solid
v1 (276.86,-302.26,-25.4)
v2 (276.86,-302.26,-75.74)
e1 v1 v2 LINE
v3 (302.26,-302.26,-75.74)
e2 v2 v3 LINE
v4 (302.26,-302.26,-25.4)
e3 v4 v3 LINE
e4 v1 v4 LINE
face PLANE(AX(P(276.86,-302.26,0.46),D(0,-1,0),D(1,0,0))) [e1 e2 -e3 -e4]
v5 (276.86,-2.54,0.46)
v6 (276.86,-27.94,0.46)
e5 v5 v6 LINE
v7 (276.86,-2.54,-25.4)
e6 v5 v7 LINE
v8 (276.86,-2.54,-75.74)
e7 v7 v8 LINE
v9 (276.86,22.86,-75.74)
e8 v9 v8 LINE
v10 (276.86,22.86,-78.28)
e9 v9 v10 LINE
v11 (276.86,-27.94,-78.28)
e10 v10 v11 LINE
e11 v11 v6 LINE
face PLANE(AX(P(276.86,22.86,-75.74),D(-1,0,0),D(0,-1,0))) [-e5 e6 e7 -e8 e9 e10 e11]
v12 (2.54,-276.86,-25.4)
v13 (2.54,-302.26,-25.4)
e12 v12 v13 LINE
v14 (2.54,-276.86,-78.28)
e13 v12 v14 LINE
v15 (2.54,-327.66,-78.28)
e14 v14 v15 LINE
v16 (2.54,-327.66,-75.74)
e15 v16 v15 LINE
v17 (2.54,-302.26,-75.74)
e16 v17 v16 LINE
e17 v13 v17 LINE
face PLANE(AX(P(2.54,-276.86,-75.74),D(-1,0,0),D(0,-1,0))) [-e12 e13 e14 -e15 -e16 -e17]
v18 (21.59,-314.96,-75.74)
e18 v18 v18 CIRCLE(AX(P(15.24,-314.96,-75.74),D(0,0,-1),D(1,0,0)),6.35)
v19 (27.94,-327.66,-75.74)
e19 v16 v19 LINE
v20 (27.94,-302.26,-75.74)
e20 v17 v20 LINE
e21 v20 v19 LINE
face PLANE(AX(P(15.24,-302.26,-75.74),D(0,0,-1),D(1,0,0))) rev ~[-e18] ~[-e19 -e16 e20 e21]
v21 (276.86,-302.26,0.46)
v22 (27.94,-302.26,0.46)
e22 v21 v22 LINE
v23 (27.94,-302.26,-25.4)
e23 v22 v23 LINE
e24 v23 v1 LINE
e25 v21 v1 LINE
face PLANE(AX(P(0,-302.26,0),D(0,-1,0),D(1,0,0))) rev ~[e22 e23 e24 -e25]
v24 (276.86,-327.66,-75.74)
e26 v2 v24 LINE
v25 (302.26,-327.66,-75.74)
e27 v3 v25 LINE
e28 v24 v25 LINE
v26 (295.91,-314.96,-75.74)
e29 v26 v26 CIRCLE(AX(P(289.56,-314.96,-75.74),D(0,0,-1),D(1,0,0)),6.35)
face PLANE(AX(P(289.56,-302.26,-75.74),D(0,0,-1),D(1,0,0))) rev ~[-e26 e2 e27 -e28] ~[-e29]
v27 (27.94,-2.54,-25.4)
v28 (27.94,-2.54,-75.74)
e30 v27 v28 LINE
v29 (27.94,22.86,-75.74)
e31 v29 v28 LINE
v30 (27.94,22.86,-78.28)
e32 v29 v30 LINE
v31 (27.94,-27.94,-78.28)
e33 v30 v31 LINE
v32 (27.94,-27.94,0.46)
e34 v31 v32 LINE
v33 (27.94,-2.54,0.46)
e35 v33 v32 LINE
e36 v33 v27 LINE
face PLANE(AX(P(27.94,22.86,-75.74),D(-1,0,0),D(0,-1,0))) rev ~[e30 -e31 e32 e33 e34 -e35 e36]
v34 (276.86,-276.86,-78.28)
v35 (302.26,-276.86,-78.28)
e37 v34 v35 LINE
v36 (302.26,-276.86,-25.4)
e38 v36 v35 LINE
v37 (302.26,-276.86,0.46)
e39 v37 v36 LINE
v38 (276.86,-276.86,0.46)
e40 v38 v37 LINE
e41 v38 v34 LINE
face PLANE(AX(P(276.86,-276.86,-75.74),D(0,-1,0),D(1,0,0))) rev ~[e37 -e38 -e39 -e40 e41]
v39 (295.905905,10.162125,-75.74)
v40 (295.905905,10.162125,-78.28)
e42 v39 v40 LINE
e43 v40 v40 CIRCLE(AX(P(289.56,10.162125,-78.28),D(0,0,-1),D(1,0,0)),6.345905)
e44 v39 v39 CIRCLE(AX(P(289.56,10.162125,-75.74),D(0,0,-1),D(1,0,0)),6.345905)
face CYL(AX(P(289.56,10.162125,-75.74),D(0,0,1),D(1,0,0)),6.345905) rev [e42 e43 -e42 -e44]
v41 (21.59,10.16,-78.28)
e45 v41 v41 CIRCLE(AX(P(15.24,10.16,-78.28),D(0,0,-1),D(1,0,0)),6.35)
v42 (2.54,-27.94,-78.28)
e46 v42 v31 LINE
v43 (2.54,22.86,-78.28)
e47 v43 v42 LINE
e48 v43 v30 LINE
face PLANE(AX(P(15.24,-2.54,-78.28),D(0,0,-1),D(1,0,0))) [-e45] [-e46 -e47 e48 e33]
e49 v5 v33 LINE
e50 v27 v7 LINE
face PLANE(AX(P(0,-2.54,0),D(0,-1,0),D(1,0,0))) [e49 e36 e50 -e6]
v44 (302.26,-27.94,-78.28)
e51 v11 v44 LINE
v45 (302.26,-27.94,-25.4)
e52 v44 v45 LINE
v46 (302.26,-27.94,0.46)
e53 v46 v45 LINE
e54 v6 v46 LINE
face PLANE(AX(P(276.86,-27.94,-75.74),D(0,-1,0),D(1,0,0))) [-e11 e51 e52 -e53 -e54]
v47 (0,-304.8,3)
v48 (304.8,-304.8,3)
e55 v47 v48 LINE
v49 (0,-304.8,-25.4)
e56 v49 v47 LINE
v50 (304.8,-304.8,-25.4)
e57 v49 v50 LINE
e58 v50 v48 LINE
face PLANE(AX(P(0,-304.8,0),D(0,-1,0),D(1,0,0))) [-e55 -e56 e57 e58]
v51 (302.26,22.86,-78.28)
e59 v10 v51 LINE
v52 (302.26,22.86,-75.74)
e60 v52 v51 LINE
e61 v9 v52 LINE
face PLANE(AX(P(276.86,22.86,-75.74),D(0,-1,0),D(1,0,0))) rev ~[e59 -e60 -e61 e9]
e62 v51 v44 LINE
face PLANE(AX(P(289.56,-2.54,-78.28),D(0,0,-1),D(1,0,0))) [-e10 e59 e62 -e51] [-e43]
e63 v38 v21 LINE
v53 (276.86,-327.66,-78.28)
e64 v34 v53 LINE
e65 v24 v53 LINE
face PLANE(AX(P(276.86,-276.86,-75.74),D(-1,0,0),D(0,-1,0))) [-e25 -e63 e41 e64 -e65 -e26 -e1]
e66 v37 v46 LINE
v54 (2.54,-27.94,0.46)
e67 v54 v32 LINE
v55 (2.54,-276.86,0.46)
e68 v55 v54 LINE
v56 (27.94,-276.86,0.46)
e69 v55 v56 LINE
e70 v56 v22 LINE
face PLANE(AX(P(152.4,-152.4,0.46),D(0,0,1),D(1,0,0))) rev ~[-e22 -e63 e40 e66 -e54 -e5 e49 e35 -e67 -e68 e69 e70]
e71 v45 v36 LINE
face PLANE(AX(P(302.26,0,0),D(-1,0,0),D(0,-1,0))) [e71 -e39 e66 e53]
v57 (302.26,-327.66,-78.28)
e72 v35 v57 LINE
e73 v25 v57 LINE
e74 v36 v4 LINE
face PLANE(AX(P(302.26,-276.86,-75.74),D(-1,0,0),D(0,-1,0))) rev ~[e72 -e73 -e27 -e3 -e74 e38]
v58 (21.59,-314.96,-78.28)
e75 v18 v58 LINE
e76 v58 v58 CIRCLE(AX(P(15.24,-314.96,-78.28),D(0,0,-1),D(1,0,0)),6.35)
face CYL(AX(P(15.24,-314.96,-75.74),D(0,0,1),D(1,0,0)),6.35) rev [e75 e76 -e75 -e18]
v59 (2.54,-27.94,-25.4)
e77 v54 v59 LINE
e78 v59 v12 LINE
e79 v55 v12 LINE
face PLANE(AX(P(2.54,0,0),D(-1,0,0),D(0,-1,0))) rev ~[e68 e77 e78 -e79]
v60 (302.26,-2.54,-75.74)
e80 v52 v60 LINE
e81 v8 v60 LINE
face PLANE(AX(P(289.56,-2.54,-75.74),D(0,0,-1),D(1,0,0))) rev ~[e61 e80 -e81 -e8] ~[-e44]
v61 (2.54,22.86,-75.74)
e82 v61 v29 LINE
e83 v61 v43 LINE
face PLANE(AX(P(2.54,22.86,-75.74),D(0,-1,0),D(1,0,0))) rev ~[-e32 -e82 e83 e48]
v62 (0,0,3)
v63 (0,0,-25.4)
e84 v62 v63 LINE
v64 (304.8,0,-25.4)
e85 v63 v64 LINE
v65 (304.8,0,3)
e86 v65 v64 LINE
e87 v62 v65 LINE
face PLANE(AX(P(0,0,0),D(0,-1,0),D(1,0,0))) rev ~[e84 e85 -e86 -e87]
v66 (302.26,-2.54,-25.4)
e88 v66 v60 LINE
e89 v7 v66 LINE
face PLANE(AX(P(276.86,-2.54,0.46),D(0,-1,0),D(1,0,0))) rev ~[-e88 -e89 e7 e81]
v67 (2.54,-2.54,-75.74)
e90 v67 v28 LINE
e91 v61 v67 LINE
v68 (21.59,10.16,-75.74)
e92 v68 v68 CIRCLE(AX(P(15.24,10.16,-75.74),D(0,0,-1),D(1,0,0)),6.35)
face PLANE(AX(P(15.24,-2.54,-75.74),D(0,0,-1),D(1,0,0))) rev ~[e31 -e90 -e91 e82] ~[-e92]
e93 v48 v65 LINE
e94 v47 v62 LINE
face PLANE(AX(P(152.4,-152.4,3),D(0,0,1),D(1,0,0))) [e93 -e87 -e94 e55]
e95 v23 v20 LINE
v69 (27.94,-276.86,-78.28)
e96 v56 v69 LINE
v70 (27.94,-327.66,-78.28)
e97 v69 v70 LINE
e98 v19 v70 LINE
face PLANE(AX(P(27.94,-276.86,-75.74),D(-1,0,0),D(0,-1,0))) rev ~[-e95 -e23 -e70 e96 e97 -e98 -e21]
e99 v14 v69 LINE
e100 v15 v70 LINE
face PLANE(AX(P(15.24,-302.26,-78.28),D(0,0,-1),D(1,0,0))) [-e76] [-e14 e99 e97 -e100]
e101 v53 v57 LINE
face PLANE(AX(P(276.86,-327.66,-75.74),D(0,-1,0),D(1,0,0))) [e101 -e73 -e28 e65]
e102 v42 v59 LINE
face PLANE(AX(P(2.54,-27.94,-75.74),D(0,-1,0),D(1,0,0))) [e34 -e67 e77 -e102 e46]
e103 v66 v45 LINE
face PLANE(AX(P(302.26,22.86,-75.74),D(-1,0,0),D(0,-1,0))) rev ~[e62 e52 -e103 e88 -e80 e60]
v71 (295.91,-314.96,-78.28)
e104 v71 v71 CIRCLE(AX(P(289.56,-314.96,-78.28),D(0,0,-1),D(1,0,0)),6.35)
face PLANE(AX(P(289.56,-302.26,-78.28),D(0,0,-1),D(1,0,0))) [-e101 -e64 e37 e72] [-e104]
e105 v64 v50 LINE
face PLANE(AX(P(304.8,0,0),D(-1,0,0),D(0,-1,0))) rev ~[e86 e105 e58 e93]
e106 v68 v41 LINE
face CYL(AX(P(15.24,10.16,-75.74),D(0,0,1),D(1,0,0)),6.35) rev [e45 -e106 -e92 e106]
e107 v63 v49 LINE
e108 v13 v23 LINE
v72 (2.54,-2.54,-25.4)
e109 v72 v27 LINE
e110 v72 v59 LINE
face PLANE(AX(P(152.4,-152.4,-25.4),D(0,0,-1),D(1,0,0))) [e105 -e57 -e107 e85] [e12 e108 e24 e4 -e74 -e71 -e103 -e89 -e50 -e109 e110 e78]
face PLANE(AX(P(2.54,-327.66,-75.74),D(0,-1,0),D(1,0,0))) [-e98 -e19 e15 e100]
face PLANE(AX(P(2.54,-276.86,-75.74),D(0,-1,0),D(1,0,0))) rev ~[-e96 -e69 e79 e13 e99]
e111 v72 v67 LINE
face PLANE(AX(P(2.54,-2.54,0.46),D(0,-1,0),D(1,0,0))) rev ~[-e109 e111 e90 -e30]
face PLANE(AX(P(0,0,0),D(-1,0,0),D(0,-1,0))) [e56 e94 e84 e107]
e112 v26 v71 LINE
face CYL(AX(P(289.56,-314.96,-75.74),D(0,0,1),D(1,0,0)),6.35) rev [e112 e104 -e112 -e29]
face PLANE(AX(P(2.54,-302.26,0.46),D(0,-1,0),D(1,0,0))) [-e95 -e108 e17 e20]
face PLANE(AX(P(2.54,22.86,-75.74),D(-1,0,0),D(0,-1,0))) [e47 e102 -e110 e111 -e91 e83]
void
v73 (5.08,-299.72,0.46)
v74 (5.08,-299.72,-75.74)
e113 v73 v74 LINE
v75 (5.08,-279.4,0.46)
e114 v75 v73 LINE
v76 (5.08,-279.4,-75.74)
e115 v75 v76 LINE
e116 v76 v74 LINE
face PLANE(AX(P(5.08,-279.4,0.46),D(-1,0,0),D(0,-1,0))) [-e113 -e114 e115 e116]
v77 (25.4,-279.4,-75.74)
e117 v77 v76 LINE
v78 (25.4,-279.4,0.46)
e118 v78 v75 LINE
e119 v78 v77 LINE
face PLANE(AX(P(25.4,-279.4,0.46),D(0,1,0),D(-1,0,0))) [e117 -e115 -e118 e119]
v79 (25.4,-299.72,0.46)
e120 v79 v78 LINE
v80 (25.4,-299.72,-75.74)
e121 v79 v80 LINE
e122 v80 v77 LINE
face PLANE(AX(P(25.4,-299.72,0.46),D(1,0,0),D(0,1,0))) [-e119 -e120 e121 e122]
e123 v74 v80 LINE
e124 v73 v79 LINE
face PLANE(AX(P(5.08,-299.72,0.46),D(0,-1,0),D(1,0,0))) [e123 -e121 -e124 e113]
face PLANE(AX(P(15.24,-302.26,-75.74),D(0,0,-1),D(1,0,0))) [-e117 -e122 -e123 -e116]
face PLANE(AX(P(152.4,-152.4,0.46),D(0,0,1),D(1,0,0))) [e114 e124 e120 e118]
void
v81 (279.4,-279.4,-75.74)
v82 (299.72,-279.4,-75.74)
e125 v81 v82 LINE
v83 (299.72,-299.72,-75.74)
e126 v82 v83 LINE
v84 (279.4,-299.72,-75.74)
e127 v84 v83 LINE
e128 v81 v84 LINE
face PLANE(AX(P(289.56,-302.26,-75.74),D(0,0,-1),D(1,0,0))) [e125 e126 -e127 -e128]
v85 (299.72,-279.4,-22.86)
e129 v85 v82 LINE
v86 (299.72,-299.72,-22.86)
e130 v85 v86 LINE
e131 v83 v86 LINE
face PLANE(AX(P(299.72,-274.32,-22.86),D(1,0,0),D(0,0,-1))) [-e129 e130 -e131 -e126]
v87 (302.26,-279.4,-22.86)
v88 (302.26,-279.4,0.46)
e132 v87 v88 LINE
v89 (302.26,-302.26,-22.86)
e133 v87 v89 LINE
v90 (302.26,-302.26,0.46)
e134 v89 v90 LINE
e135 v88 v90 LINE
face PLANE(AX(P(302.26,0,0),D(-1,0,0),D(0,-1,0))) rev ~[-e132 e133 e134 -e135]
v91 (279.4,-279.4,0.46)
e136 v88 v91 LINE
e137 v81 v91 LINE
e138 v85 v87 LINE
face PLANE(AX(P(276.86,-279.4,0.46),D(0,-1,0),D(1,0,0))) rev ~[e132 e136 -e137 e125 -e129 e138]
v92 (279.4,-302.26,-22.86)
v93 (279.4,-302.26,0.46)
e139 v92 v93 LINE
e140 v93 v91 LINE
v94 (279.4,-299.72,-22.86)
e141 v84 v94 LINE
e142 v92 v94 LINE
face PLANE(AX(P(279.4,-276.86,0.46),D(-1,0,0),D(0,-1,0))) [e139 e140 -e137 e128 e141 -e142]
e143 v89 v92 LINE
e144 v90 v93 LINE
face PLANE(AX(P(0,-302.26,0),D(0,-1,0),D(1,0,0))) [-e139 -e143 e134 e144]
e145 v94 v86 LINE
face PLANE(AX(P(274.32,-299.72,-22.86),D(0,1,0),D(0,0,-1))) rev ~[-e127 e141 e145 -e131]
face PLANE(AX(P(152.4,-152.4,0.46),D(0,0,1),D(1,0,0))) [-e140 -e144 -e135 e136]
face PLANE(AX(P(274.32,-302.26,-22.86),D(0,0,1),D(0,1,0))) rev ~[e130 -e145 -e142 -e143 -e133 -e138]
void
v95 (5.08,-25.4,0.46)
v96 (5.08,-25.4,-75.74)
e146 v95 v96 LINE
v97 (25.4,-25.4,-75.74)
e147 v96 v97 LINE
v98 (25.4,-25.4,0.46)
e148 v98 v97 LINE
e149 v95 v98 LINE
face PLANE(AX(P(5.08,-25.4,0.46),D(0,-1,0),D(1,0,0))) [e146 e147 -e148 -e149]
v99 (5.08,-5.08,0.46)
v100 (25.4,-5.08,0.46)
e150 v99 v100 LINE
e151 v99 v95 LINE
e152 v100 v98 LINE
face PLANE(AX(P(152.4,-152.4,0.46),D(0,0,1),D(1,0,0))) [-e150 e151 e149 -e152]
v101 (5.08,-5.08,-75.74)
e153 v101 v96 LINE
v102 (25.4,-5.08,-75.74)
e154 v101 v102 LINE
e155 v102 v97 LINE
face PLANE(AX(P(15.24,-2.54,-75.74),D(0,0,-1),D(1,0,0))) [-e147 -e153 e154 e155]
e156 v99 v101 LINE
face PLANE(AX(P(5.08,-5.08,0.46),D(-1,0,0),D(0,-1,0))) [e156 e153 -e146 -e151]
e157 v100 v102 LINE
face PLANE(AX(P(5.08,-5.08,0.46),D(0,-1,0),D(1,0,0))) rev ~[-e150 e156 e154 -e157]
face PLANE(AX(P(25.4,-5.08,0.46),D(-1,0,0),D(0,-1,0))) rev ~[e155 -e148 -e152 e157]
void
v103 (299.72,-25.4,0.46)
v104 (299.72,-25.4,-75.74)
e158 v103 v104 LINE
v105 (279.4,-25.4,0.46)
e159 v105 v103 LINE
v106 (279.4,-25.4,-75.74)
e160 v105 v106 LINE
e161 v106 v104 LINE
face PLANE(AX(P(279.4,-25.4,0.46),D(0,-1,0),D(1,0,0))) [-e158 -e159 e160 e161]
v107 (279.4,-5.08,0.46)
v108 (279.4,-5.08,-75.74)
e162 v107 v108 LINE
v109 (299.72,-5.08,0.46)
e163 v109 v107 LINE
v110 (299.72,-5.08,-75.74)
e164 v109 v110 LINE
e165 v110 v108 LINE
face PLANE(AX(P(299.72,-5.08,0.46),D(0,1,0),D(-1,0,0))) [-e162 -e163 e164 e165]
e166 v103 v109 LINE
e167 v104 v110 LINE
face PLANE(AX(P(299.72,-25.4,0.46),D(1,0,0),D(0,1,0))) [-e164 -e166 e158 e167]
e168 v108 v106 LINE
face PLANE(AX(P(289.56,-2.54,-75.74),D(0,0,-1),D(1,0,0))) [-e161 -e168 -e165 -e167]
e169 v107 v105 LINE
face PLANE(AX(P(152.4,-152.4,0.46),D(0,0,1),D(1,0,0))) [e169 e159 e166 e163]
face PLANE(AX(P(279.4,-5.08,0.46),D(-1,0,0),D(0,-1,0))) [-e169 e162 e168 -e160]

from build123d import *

# Parameters (mm, degrees)
F0_W         = 304.8
F0_H         = 304.8
F1_DEPTH     = 3
F2_W         = 304.8
F2_H         = 304.8
F3_DEPTH     = 25.4
F4_T         = -2.54
F5_W         = 25.4
F5_H         = 25.4
F6_DEPTH     = 76.2
F7_T         = 2.54
F7_T3_DEPTH  = 30.48
F7_T5_DEPTH  = 30.48
F7_T7_DEPTH  = 30.94
F7_T9_DEPTH  = 304.8
F7_T11_DEPTH = 279.4
F7_T13_DEPTH = 279.4
F7_T15_DEPTH = 304.8
F8_W         = 25.4
F8_H         = 25.4
F8_W_2       = 20.32
F8_H_2       = 20.32
F9_DEPTH     = 76.2
F10_W        = 25.4
F10_H        = 50.8
F10_R        = 6.3459053742
F11_DEPTH    = 2.54
F12_W        = 25.4
F12_H        = 50.8
F12_R        = 6.35
F13_DEPTH    = 2.54
F14_W        = 25.4
F14_H        = 50.8
F14_R        = 6.35
F15_DEPTH    = 2.54
F16_W        = 25.4
F16_H        = 50.8
F16_R        = 6.35
F17_DEPTH    = 2.54


# Not quite as in the source:
# - a shell that OpenCascade refuses in one call is made with other operations: the cavity is built on its own and cut out


with BuildPart() as f1:
    # F0 (on Top) → F1 (new body)
    with BuildSketch(Plane.XY):
        with Locations((152.4, -152.4)):
            Rectangle(F0_W, F0_H)
    extrude(amount=F1_DEPTH)

    # F2 (on face) → F3 (join)
    with BuildSketch(Plane(origin=(0, 0, 0), x_dir=(1, 0, 0), z_dir=(0, 0, -1))):
        with Locations((152.4, 152.4)):
            Rectangle(F2_W, F2_H)
    extrude(amount=F3_DEPTH)

    # F4
    f4_openings = [f1.faces().sort_by_distance(p)[0] for p in [
        (152.4, -152.4, -25.4),
    ]]
    offset(amount=F4_T, openings=f4_openings)

    # F5 (on face) → F6 (join)
    with BuildSketch(Plane(origin=(0, 0, 0.46), x_dir=(1, 0, 0), z_dir=(0, 0, -1))):
        with Locations((289.56, 289.56)):
            Rectangle(F5_W, F5_H)
    extrude(amount=F6_DEPTH)

    # F7: shell of thickness 2.54, made by hand


with BuildPart() as f7_core1:
    # F7_t2: copy of F1
    add(f1.part)

    # the walls: a layer under each face that stays
    f7_faces = [f7_core1.faces().sort_by_distance(p)[0] for p in [
        (152.4, -304.8, -11.2),
        (152.4, -152.4, 3),
        (304.8, -152.4, -11.2),
        (2.38125, -120.4148148148, -25.4),
        (0, -152.4, -11.2),
        (152.4, 0, -11.2),
        (2.54, -152.4, -12.47),
        (289.56, -302.26, -50.57),
        (139.7, -302.26, -12.47),
        (302.26, -139.7, -12.47),
        (302.26, -289.56, -50.57),
        (152.4, -2.54, -12.47),
        (152.4, -152.4, 0.46),
        (276.86, -289.56, -37.64),
        (289.56, -276.86, -37.64),
    ]]
    thicken(f7_faces, amount=-F7_T, mode=Mode.SUBTRACT)

    # F7_s4 → F7_t3 (cut)
    with BuildSketch(Plane.YZ.offset(274.32)):
        Polygon((-302.2854, -25.4254), (-302.26, -22.86), (-299.72, -22.86), (-299.72, -25.4), align=None)
        Polygon((-276.8346, 0.4346), (-276.86, 3), (-279.4, 3), (-279.4, 0.46), align=None)
    extrude(amount=F7_T3_DEPTH, mode=Mode.SUBTRACT)

    # F7_s6 → F7_t5 (cut)
    with BuildSketch(Plane.XZ.offset(274.32)):
        Polygon((302.2854, -25.4254), (302.26, -22.86), (299.72, -22.86), (299.72, -25.4), align=None)
        Polygon((276.8346, 0.4346), (276.86, 3), (279.4, 3), (279.4, 0.46), align=None)
    extrude(amount=F7_T5_DEPTH, mode=Mode.SUBTRACT)

    # F7_s8 → F7_t7 (cut)
    with BuildSketch(Plane.XY.offset(-27.94)):
        Polygon((2.5654, -2.5654), (0, -2.54), (0, 0), (2.54, 0), align=None)
        Polygon((2.5654, -302.2346), (0, -302.26), (0, -304.8), (2.54, -304.8), align=None)
        Polygon((276.8346, -302.2346), (276.86, -304.8), (279.4, -304.8), (279.4, -302.26), align=None)
        Polygon((302.2346, -2.5654), (304.8, -2.54), (304.8, 0), (302.26, 0), align=None)
        Polygon((302.2346, -276.8346), (304.8, -276.86), (304.8, -279.4), (302.26, -279.4), align=None)
    extrude(amount=F7_T7_DEPTH, mode=Mode.SUBTRACT)

    # F7_s10 → F7_t9 (cut)
    with BuildSketch(Plane.XZ):
        Polygon((2.5654, 0.4346), (0, 0.46), (0, 3), (2.54, 3), align=None)
    extrude(amount=F7_T9_DEPTH, mode=Mode.SUBTRACT)

    # F7_s12 → F7_t11 (cut)
    with BuildSketch(Plane.YZ):
        Polygon((-302.2346, 0.4346), (-304.8, 0.46), (-304.8, 3), (-302.26, 3), align=None)
    extrude(amount=F7_T11_DEPTH, mode=Mode.SUBTRACT)

    # F7_s14 → F7_t13 (cut)
    with BuildSketch(Plane.XZ):
        Polygon((302.2346, 0.4346), (304.8, 0.46), (304.8, 3), (302.26, 3), align=None)
    extrude(amount=F7_T13_DEPTH, mode=Mode.SUBTRACT)

    # F7_s16 → F7_t15 (cut)
    with BuildSketch(Plane.YZ):
        Polygon((-2.5654, 0.4346), (0, 0.46), (0, 3), (-2.54, 3), align=None)
    extrude(amount=F7_T15_DEPTH, mode=Mode.SUBTRACT)


with BuildPart() as f1_1:
    add(f1.part)

    # what is left inside the walls is the cavity
    f7_cavity = [f7_core1.part.solids().sort_by_distance(p)[0] for p in [
        (290.83, -279.4254, -50.34),
    ]]
    add(f7_cavity, mode=Mode.SUBTRACT)

    # F8 (on face) → F9 (join)
    with BuildSketch(Plane(origin=(0, 0, 0.46), x_dir=(1, 0, 0), z_dir=(0, 0, -1))):
        with Locations((15.24, 15.24)):
            Rectangle(F8_W, F8_H)
        with Locations((15.24, 15.24)):
            Rectangle(F8_W_2, F8_H_2, mode=Mode.SUBTRACT)
        with Locations((289.56, 15.24)):
            Rectangle(F8_W, F8_H)
        Polygon((279.4, 5.08), (279.4, 15.24), (279.4, 25.4), (299.72, 25.4), (299.72, 5.08), align=None, mode=Mode.SUBTRACT)
        with Locations((15.24, 289.56)):
            Rectangle(F8_W, F8_H)
        Polygon((25.4, 279.4), (15.24, 279.4), (5.08, 279.4), (5.08, 299.72), (25.4, 299.72), align=None, mode=Mode.SUBTRACT)
    extrude(amount=F9_DEPTH)

    # F10 (on face) → F11 (join)
    with BuildSketch(Plane(origin=(0, 0, -75.74), x_dir=(1, 0, 0), z_dir=(0, 0, -1))):
        with Locations((289.56, 2.54)):
            Rectangle(F10_W, F10_H)
        with Locations((289.56, -10.1621253416)):
            Circle(F10_R, mode=Mode.SUBTRACT)
    extrude(amount=F11_DEPTH)

    # F12 (on face) → F13 (join)
    with BuildSketch(Plane(origin=(0, 0, -75.74), x_dir=(1, 0, 0), z_dir=(0, 0, -1))):
        with Locations((15.24, 2.54)):
            Rectangle(F12_W, F12_H)
        with Locations((15.24, -10.16)):
            Circle(F12_R, mode=Mode.SUBTRACT)
    extrude(amount=F13_DEPTH)

    # F14 (on face) → F15 (join)
    with BuildSketch(Plane(origin=(0, 0, -75.74), x_dir=(1, 0, 0), z_dir=(0, 0, -1))):
        with Locations((15.24, 302.26)):
            Rectangle(F14_W, F14_H)
        with Locations((15.24, 314.96)):
            Circle(F14_R, mode=Mode.SUBTRACT)
    extrude(amount=F15_DEPTH)

    # F16 (on face) → F17 (join)
    with BuildSketch(Plane(origin=(0, 0, -75.74), x_dir=(1, 0, 0), z_dir=(0, 0, -1))):
        with Locations((289.56, 302.26)):
            Rectangle(F16_W, F16_H)
        with Locations((289.56, 314.96)):
            Circle(F16_R, mode=Mode.SUBTRACT)
    extrude(amount=F17_DEPTH)


solid = f1_1.part
